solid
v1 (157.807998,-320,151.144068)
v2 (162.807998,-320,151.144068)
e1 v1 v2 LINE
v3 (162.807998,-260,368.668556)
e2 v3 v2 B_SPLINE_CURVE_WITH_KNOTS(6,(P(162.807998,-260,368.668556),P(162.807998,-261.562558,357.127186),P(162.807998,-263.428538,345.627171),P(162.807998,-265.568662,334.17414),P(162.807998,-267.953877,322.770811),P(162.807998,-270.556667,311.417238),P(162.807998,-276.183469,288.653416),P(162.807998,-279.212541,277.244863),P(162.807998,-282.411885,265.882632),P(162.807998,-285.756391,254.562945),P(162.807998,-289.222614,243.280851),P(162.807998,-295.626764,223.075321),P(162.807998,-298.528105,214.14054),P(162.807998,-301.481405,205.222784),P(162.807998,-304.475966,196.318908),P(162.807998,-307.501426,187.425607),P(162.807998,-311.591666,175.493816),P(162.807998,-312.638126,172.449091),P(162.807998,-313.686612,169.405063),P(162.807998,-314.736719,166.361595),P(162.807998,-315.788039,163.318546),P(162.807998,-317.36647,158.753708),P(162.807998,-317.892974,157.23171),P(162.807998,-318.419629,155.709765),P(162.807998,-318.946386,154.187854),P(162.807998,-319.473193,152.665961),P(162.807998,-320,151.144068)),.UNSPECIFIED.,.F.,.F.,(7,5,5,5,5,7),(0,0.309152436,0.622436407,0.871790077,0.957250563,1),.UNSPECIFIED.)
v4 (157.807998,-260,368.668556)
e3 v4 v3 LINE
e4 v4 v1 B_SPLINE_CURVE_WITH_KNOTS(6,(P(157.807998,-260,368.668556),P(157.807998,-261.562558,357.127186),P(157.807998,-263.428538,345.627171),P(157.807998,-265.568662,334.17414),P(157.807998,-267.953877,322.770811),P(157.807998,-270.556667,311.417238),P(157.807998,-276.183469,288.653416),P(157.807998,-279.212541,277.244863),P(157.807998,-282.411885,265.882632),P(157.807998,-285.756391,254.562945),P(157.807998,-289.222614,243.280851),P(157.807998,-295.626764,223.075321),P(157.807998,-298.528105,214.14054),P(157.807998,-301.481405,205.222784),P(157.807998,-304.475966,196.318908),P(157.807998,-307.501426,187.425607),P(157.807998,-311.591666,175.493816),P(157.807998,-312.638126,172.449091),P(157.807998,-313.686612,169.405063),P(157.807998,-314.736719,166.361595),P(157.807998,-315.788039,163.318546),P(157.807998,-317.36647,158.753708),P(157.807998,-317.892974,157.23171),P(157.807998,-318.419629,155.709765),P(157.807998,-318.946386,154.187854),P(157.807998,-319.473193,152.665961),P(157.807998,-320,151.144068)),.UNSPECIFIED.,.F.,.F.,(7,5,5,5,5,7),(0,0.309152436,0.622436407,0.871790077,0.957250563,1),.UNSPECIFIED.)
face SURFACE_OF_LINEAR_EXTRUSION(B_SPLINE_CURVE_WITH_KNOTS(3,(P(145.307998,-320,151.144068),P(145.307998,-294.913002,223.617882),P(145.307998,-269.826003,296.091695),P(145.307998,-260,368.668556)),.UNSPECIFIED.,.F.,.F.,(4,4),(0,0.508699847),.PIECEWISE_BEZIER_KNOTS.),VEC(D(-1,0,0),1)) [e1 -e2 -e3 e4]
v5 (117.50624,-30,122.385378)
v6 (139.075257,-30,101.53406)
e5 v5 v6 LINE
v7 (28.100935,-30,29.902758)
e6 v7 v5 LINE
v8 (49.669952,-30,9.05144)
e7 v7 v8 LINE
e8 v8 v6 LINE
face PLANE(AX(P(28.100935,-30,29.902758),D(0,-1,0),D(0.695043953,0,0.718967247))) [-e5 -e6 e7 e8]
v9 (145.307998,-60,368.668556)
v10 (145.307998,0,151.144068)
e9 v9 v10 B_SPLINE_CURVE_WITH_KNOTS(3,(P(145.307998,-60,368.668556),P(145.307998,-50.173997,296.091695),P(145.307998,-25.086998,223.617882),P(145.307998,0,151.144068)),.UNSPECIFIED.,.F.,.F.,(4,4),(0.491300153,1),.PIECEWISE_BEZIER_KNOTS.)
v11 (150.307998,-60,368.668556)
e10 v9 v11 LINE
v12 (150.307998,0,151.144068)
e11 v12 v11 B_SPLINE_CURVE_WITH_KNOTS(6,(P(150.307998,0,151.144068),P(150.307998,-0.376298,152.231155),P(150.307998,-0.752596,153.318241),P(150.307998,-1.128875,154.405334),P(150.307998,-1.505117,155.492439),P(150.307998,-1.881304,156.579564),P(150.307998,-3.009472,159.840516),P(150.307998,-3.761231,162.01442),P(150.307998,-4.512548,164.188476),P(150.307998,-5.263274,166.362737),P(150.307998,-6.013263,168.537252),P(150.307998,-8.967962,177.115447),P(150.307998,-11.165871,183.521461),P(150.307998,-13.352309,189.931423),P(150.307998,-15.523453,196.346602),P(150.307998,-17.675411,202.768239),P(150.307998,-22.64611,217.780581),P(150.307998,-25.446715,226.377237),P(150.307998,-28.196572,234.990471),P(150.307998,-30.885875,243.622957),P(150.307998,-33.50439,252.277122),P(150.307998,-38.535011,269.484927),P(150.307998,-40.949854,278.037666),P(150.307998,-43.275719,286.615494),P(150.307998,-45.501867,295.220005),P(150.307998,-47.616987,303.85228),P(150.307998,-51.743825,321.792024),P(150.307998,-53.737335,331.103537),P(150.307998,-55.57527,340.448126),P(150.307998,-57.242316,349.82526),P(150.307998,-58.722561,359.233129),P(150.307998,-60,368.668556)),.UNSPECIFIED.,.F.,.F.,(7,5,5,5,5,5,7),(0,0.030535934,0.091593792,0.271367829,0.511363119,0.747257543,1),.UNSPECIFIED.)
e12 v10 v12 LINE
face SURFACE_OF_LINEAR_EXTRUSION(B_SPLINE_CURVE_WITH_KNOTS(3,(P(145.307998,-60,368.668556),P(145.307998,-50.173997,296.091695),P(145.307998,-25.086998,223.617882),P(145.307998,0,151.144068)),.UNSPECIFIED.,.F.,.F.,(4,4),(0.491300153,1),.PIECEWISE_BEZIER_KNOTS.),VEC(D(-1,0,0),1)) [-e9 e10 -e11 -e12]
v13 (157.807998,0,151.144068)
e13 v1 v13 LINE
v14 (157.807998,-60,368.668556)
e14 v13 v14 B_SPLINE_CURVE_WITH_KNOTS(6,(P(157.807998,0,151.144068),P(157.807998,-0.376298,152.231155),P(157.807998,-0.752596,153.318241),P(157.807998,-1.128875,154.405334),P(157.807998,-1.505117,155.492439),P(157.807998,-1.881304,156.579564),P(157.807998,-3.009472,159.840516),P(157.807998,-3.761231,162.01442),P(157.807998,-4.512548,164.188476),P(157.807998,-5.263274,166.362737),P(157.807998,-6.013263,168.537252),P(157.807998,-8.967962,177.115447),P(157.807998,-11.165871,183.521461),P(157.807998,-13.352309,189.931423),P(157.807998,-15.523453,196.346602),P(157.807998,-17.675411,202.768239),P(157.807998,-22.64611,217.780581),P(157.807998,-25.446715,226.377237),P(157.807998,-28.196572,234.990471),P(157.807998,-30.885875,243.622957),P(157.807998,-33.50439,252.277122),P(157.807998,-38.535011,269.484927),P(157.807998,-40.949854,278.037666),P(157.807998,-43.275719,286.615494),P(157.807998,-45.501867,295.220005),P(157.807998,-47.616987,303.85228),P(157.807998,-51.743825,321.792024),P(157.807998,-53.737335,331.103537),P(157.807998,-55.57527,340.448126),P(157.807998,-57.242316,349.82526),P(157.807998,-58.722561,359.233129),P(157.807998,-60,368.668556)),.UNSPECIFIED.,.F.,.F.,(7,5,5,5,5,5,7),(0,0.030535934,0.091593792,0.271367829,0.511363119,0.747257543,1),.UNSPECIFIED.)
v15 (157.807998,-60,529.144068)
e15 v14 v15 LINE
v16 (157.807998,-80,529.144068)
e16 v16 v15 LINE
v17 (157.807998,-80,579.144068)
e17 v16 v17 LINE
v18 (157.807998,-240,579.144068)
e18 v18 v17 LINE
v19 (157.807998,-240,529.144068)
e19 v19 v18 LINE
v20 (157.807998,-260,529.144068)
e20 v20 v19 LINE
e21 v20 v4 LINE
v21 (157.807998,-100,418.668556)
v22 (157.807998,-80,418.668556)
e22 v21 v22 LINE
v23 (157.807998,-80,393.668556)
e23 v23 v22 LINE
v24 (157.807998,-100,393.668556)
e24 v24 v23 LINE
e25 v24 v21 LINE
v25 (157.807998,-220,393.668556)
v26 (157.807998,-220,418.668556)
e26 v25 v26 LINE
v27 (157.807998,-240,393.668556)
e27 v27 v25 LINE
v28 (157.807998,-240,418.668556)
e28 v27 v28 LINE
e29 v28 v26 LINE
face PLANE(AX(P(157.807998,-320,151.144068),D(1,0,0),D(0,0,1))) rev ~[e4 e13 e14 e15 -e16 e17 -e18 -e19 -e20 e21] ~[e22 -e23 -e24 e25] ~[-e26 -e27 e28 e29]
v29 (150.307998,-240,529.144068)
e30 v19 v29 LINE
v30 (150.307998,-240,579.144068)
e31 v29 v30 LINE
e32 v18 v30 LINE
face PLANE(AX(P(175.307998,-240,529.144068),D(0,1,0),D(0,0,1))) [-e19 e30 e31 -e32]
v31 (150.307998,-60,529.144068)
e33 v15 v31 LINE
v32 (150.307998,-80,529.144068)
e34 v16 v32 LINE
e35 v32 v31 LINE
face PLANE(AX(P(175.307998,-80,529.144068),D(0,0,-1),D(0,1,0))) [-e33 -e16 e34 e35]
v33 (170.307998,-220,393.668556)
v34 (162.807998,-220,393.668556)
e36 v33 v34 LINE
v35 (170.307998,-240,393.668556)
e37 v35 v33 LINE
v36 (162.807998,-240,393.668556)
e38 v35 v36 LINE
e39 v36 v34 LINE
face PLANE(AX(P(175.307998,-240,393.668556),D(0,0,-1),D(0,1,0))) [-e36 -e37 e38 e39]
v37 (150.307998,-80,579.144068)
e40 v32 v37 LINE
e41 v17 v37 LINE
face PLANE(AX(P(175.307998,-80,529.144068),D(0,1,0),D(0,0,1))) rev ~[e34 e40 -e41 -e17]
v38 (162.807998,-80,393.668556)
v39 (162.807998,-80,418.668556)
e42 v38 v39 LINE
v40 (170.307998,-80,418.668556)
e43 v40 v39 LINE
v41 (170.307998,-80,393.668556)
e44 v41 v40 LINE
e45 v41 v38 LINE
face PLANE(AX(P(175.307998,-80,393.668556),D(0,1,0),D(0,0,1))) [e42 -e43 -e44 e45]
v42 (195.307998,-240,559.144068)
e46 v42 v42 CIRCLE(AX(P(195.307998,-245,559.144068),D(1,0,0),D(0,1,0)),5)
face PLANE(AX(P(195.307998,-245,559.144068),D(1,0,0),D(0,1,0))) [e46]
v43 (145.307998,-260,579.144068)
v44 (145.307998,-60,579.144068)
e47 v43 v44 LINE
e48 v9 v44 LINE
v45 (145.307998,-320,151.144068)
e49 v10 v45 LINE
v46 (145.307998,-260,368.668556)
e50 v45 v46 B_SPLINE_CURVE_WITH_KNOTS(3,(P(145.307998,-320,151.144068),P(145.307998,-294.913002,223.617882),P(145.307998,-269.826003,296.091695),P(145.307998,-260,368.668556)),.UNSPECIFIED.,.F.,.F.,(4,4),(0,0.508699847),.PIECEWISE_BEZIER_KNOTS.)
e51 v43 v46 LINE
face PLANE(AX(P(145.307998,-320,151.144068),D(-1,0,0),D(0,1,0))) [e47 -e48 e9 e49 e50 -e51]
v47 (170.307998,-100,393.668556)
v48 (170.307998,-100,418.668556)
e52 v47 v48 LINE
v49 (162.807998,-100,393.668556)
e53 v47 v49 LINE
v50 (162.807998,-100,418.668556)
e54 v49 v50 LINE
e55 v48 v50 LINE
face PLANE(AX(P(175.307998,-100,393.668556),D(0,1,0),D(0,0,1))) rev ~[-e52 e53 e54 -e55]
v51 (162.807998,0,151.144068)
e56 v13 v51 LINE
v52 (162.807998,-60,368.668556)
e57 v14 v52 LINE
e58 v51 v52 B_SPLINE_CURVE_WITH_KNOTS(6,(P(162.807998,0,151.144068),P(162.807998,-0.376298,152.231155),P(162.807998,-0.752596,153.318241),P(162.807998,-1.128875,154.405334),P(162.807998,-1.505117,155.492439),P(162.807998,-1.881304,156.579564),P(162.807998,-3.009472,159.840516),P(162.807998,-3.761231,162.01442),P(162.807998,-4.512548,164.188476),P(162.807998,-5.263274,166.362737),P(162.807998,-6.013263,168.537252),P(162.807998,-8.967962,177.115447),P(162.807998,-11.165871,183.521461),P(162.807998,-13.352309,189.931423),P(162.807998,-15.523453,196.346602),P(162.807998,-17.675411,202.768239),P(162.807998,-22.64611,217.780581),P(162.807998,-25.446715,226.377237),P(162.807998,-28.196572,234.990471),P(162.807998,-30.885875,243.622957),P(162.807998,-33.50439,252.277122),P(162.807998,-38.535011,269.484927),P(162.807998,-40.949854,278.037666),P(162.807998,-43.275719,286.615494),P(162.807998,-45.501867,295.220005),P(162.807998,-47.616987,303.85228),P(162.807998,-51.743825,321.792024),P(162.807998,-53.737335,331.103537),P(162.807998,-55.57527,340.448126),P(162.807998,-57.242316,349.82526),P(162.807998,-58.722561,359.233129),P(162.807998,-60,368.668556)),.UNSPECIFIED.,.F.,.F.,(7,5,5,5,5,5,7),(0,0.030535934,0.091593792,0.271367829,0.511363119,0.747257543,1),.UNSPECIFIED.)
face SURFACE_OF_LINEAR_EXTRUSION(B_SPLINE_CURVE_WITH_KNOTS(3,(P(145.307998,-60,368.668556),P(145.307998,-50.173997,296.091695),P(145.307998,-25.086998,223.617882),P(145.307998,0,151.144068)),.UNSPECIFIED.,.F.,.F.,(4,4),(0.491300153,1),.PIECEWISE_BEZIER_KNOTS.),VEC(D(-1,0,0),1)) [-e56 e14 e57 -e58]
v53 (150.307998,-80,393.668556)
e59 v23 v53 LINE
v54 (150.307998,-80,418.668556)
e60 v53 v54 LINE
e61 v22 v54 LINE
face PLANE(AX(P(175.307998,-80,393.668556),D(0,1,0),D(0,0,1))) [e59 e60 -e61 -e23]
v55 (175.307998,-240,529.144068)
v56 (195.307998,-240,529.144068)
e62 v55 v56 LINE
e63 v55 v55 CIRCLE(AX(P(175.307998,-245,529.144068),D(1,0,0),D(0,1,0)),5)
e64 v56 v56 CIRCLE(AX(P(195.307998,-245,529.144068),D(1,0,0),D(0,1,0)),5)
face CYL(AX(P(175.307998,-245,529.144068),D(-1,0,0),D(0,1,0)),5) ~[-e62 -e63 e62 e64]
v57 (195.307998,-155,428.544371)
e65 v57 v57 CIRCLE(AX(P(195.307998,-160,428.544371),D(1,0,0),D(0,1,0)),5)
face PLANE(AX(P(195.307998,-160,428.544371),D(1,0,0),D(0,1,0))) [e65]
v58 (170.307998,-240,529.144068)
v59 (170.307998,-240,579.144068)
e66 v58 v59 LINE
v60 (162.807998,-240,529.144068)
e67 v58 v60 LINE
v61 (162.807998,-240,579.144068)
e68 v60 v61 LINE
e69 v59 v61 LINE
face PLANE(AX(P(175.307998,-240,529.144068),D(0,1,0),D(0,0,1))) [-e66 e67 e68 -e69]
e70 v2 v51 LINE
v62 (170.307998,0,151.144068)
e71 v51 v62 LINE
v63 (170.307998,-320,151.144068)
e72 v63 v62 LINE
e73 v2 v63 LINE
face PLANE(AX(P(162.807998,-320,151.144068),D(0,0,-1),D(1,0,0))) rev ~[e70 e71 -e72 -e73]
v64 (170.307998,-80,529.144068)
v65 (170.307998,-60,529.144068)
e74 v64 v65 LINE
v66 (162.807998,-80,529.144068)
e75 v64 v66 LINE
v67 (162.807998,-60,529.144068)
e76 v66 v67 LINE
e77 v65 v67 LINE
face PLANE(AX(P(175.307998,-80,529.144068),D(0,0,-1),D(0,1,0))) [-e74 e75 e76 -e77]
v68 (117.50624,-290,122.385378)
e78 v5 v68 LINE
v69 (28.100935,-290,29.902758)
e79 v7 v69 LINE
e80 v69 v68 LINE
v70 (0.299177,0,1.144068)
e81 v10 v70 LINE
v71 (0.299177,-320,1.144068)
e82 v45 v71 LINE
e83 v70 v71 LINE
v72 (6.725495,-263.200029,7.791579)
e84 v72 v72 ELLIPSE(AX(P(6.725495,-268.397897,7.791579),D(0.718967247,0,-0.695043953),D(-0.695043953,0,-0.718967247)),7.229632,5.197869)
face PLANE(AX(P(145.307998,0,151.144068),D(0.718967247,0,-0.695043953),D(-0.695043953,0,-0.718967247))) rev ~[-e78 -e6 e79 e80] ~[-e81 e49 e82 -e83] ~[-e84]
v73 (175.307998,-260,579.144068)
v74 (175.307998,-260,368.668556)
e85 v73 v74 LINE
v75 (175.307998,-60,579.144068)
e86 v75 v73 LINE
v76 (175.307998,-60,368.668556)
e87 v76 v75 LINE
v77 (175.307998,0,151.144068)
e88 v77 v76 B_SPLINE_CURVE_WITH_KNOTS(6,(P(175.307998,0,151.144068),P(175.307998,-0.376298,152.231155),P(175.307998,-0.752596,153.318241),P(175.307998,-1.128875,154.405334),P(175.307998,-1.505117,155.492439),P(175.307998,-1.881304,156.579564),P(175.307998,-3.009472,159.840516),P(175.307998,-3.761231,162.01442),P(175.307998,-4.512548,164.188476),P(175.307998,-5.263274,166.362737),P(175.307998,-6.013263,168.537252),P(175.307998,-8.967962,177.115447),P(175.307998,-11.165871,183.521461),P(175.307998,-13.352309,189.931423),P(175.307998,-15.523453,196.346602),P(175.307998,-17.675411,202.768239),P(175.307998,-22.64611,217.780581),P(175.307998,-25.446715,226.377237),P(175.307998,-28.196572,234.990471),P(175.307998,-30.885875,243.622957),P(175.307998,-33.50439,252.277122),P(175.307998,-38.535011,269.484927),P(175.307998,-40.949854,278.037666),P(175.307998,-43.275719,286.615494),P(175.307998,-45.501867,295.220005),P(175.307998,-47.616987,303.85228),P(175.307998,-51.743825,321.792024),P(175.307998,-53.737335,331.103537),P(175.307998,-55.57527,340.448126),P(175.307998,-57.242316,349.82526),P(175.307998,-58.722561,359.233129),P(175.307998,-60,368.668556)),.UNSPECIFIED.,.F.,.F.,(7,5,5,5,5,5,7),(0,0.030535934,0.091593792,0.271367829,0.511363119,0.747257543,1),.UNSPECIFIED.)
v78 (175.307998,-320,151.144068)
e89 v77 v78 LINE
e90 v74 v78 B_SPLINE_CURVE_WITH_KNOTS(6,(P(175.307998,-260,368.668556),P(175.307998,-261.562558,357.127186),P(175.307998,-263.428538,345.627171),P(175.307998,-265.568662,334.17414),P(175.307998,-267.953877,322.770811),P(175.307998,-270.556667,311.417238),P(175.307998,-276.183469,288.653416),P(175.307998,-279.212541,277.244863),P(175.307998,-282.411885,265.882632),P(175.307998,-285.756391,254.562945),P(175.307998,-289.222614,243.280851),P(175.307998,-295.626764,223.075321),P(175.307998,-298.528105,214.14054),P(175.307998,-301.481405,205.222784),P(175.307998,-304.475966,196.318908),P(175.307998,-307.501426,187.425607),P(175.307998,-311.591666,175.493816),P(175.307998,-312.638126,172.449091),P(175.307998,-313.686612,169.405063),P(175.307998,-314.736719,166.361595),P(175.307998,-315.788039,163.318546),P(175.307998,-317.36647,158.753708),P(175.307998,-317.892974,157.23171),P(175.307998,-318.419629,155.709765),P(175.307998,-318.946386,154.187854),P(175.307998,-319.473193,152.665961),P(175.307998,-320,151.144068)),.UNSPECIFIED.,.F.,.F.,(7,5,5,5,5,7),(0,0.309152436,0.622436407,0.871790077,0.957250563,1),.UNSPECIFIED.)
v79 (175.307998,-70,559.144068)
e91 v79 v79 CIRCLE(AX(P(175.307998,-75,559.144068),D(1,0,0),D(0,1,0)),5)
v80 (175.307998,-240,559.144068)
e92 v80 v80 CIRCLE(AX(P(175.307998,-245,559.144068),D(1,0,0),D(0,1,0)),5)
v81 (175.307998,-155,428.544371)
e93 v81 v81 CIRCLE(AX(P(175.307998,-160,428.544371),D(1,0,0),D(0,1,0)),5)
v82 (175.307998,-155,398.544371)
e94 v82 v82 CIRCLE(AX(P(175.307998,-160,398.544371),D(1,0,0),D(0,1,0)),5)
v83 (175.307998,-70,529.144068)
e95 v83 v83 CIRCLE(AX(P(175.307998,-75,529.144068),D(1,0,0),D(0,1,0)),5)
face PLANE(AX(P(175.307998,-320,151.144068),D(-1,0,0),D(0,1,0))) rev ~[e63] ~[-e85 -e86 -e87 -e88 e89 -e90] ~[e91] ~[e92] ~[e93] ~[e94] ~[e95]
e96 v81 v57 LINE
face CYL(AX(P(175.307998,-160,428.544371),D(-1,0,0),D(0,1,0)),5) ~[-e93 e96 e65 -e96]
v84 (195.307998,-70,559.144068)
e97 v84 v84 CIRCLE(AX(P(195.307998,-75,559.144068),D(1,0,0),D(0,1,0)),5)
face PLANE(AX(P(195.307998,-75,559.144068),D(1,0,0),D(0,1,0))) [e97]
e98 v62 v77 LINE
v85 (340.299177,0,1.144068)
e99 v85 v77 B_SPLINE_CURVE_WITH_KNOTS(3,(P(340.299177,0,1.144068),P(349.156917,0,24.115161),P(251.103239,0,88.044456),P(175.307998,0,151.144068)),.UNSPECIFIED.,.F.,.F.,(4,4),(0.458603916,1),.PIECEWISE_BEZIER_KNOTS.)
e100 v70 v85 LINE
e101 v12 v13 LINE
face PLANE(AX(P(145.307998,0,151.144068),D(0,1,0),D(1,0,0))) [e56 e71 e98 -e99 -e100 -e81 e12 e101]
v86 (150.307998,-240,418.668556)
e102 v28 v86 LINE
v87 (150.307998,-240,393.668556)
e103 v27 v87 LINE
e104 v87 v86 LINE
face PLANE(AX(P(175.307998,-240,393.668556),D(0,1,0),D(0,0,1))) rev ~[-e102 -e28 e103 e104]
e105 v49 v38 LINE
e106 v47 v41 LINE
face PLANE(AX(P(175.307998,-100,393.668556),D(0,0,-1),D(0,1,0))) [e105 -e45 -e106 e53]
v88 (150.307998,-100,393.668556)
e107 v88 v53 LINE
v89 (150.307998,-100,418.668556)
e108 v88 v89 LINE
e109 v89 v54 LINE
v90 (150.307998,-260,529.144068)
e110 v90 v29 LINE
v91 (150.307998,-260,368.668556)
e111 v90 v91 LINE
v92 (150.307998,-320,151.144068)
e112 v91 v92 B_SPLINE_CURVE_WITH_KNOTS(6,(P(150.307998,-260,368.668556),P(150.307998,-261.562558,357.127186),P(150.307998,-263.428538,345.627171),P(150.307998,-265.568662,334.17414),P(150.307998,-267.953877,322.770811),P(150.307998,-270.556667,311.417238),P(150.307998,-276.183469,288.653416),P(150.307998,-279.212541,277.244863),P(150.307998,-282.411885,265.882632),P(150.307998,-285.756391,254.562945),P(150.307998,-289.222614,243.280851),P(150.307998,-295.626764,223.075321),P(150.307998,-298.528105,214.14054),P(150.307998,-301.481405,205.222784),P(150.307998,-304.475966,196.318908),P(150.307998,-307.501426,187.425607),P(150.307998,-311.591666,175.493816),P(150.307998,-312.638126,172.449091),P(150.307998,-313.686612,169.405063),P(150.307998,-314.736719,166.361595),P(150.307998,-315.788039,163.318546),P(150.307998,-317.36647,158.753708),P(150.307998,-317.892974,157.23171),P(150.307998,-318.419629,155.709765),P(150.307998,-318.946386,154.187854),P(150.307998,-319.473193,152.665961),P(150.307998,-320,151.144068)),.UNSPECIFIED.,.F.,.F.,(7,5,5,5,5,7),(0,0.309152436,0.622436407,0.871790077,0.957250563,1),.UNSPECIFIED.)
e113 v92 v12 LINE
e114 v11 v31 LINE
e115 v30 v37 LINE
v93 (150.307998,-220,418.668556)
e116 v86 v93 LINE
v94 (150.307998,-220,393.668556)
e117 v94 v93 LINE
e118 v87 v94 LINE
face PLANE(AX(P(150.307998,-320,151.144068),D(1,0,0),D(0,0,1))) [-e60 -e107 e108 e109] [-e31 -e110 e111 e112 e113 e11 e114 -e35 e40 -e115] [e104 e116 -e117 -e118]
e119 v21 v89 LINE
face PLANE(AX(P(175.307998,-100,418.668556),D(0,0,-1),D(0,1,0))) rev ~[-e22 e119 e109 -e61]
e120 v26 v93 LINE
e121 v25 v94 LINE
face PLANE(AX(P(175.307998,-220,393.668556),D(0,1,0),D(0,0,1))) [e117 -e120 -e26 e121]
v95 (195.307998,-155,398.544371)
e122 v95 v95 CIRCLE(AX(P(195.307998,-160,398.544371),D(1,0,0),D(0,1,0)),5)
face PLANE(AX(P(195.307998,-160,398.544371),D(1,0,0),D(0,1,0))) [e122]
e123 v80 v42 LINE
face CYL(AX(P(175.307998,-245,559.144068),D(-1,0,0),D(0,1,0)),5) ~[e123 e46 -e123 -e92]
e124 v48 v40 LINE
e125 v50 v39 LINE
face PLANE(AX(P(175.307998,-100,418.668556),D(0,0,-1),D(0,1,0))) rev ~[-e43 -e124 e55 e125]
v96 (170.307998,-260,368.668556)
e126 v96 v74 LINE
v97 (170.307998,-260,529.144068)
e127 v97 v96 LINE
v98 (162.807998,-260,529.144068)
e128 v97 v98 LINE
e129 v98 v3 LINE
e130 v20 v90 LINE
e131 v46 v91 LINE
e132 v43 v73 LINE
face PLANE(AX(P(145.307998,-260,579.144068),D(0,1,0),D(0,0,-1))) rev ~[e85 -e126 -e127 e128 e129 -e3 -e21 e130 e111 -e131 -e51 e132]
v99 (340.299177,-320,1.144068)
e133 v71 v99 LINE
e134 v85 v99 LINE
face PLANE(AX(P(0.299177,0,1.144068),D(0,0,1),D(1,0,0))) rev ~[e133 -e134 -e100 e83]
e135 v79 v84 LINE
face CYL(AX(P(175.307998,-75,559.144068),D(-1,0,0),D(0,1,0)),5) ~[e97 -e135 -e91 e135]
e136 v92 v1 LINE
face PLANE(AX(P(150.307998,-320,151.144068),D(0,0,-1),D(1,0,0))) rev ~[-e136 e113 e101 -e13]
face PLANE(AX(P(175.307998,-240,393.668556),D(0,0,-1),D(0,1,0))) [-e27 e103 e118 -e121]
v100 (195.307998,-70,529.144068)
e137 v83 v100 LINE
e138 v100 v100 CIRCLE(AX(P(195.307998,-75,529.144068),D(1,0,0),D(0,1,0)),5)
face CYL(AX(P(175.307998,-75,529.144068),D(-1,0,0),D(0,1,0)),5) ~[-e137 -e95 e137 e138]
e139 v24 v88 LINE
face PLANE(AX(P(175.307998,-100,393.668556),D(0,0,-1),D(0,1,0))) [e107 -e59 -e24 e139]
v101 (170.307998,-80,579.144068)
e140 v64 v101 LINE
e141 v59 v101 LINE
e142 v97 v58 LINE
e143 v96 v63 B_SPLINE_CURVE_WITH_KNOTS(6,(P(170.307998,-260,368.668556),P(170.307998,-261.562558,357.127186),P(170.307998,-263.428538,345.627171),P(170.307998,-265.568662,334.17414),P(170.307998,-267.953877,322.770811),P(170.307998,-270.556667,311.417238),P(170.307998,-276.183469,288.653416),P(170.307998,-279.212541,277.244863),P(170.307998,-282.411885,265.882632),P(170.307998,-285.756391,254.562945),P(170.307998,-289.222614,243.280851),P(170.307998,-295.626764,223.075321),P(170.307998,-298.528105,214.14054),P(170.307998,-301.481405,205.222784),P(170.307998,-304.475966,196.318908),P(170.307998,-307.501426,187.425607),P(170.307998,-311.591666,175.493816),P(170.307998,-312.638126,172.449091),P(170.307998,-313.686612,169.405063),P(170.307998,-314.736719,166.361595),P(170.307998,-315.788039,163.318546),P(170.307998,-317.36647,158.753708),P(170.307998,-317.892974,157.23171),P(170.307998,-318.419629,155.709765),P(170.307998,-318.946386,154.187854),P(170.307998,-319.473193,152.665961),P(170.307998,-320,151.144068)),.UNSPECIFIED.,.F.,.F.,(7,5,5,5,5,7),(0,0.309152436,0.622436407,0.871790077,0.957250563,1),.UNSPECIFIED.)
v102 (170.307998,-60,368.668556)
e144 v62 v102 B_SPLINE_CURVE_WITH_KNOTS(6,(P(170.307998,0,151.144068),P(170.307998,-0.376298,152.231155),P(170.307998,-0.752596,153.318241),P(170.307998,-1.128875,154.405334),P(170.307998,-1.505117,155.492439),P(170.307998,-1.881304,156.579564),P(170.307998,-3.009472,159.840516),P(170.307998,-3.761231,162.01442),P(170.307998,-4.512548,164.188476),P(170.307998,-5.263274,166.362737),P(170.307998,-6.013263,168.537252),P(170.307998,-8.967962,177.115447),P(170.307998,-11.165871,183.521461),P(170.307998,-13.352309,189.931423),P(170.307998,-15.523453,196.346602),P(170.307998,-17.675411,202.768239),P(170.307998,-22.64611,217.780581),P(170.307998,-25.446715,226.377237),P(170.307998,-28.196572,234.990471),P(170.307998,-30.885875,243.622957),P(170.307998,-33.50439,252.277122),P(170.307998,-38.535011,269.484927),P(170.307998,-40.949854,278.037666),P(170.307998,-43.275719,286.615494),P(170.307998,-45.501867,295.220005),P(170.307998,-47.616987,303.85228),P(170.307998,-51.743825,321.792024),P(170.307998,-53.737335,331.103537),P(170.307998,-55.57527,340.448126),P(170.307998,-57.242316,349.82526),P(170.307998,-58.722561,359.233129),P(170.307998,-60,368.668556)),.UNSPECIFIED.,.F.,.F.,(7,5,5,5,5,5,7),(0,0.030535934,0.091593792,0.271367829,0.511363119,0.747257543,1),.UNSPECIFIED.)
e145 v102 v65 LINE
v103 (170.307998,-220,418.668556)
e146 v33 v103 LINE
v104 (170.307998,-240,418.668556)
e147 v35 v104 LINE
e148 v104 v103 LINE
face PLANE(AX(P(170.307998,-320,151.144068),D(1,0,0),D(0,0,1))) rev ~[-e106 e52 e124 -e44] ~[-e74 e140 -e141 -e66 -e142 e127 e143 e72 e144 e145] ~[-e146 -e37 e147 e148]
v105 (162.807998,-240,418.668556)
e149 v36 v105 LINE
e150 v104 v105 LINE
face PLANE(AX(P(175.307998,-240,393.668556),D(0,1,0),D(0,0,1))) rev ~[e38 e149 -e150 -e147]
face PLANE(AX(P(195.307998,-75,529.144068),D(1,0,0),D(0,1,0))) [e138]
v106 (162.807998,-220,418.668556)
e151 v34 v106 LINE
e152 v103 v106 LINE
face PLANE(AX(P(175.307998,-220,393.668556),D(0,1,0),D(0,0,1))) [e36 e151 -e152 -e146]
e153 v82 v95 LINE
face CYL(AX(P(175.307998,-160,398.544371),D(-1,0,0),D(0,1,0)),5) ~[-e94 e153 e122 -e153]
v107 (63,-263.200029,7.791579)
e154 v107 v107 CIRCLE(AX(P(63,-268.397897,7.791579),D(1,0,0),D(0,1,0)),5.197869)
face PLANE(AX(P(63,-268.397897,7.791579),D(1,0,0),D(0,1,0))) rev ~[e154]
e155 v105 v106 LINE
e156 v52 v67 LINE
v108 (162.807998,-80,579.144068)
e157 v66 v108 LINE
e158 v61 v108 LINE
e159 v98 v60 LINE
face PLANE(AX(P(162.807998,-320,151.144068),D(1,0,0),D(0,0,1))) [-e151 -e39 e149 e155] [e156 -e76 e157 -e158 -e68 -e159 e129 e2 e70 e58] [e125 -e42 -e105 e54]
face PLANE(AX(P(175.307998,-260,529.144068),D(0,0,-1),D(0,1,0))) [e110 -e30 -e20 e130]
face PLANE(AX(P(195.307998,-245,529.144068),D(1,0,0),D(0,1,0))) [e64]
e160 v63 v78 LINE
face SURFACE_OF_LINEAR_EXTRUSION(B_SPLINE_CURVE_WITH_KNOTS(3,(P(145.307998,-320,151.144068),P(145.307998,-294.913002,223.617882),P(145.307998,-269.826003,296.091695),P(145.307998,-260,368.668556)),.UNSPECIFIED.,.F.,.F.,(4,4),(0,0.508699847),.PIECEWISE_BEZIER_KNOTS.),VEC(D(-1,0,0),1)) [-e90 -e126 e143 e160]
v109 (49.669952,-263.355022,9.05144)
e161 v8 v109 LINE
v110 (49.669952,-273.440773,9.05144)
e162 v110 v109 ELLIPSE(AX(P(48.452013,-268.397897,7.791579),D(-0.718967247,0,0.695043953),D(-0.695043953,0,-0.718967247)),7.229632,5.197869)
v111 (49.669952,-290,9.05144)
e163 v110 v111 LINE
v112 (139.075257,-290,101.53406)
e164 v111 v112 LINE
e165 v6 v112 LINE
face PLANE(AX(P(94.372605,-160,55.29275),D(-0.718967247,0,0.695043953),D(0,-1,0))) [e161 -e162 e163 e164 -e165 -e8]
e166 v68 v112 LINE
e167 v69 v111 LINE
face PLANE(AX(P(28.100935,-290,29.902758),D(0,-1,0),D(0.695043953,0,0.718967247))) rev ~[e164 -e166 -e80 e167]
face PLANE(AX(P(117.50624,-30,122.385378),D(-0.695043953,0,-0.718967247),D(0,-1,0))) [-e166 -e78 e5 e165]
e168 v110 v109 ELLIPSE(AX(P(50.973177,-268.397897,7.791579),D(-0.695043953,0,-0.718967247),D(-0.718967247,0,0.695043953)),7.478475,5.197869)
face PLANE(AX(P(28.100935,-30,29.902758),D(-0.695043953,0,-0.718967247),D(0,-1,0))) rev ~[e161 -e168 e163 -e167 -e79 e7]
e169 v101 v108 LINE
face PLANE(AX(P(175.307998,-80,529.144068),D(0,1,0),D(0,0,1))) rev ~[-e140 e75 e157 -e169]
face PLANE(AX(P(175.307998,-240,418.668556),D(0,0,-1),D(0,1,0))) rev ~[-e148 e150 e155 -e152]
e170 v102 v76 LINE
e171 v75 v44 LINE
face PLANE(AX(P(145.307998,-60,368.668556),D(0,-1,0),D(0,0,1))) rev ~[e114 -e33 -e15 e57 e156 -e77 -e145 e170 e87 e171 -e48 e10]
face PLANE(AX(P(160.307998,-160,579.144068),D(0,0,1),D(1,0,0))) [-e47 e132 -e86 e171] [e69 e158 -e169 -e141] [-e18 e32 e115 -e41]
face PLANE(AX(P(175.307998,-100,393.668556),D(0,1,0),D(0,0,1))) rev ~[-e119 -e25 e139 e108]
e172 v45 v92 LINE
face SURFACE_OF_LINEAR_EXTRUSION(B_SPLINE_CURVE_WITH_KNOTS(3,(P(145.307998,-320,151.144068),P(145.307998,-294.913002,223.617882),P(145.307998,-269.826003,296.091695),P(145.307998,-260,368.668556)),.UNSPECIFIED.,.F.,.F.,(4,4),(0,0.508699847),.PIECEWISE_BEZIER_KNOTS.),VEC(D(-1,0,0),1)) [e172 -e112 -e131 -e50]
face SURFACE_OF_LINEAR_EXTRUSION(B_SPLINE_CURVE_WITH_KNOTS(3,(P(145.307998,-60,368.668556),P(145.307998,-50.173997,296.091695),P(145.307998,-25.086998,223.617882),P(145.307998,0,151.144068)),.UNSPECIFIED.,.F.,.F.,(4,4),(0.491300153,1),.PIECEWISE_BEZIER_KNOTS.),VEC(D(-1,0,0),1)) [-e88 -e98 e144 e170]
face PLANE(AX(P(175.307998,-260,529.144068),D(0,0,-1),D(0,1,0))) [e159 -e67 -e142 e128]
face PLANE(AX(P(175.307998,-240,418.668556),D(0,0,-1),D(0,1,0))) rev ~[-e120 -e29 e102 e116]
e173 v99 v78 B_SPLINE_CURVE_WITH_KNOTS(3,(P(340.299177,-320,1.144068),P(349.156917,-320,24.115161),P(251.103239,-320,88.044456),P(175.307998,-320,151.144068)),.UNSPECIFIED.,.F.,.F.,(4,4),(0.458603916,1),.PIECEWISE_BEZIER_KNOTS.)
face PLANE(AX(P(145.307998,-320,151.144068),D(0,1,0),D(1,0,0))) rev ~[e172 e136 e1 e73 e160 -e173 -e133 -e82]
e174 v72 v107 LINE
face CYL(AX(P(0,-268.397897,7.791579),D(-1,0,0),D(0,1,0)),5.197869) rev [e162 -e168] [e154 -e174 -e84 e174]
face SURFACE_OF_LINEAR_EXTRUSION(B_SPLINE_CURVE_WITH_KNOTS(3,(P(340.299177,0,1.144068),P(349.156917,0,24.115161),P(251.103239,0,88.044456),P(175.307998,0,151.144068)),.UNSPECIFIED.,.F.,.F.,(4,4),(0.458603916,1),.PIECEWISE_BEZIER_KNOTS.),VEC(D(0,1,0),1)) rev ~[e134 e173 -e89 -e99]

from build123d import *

# Parameters (mm, degrees)
F1_DEPTH  = 320
F2_W      = 30
F2_H      = 320
F3_DEPTH  = 428
F5_DEPTH  = 205
F7_W      = 260
F7_H      = 128.6325914682
F8_DEPTH  = 30
F9_W      = 7.5
F9_H      = 457.219858036
F10_DEPTH = 977
F6_W      = 20
F6_H      = 50
F6_H_2    = 25
F11_DEPTH = 25
F12_R     = 5.1978686685
F13_DEPTH = 63
F14_R     = 5
F15_DEPTH = 20


with BuildPart() as f1:
    # F0 (on Front) → F1 (new body)
    with BuildSketch(Plane.XZ):
        with BuildLine():
            Line((150.299176857, 1.1440683747), (180.299176857, 1.1440683747))
            Line((180.299176857, 1.1440683747), (340.299176857, 1.1440683747))
            add(Edge.make_bspline(
                [(340.299176857, 1.1440683747), (349.1569172885, 24.1151609846), (251.1032390966, 88.0444564268), (175.3079980464, 151.1440683747)],
                knots=[0.4586039165, 0.4586039165, 0.4586039165, 0.4586039165, 1, 1, 1, 1], degree=3))
            Line((175.3079980464, 151.1440683747), (145.3079980464, 151.1440683747))
            Line((145.3079980464, 151.1440683747), (0.299176857, 1.1440683747))
            Line((0.299176857, 1.1440683747), (100.299176857, 1.1440683747))
            Line((100.299176857, 1.1440683747), (150.299176857, 1.1440683747))
        make_face()
    extrude(amount=F1_DEPTH)

    # F2 (on face) → F3 (join)
    with BuildSketch(Plane.XY.offset(151.1440683747)):
        with Locations((160.3079980464, -160)):
            Rectangle(F2_W, F2_H)
    extrude(amount=F3_DEPTH)

    # F4 (on face) → F5 (cut)
    with BuildSketch(Plane(origin=(145.3079980464, 0, 0), x_dir=(0, -1, 0), z_dir=(-1, 0, 0))):
        with BuildLine():
            Line((0, 579.1440683747), (0, 151.1440683747))
            add(Edge.make_bspline(
                [(60, 368.6685562134), (50.1739969339, 296.0916949665), (25.086998467, 223.6178816706), (0, 151.1440683747)],
                knots=[0.4913001533, 0.4913001533, 0.4913001533, 0.4913001533, 1, 1, 1, 1], degree=3))
            Line((60, 368.6685562134), (60, 579.1440683747))
            Line((60, 579.1440683747), (0, 579.1440683747))
        make_face()
        with BuildLine():
            add(Edge.make_bspline(
                [(320, 151.1440683747), (294.913001533, 223.6178816706), (269.8260030661, 296.0916949665), (260, 368.6685562134)],
                knots=[0, 0, 0, 0, 0.5086998467, 0.5086998467, 0.5086998467, 0.5086998467], degree=3))
            Line((320, 151.1440683747), (320, 579.1440683747))
            Line((320, 579.1440683747), (260, 579.1440683747))
            Line((260, 579.1440683747), (260, 368.6685562134))
        make_face()
    extrude(amount=-F5_DEPTH, mode=Mode.SUBTRACT)

    # F7 (on face) → F8 (cut)
    with BuildSketch(Plane(origin=(-0.4170581217, 0, 0.4031807106), x_dir=(0, -1, 0), z_dir=(-0.7189672474, 0, 0.6950439534))):
        with Locations((160, 105.3467844897)):
            Rectangle(F7_W, F7_H)
    extrude(amount=-F8_DEPTH, mode=Mode.SUBTRACT)

    # F9 (on face) → F10 (cut)
    with BuildSketch(Plane.XZ.offset(320)):
        with Locations((154.0579980464, 379.7539973927)):
            Rectangle(F9_W, F9_H)
        with Locations((166.5579980464, 379.7539973927)):
            Rectangle(F9_W, F9_H)
    extrude(amount=-F10_DEPTH, mode=Mode.SUBTRACT)

    # F6 (on face) → F11 (join)
    with BuildSketch(Plane.YZ.offset(175.3079980464)):
        with Locations((-250, 554.1440683747)):
            Rectangle(F6_W, F6_H)
        with Locations((-70, 554.1440683747)):
            Rectangle(F6_W, F6_H)
        with Locations((-230, 406.1685562134)):
            Rectangle(F6_W, F6_H_2)
        with Locations((-90, 406.1685562134)):
            Rectangle(F6_W, F6_H_2)
    extrude(amount=-F11_DEPTH)

    # F12 (on Right) → F13 (cut)
    with BuildSketch(Plane.YZ):
        with Locations((-268.3978974819, 7.7915792353)):
            Circle(F12_R)
    extrude(amount=F13_DEPTH, mode=Mode.SUBTRACT)

    # F14 (on face) → F15 (join)
    with BuildSketch(Plane.YZ.offset(175.3079980464)):
        with Locations((-245, 559.1440683747)):
            Circle(F14_R)
        with Locations((-245, 529.1440683747)):
            Circle(F14_R)
        with Locations((-75, 559.1440683747)):
            Circle(F14_R)
        with Locations((-75, 529.1440683747)):
            Circle(F14_R)
        with Locations((-160, 428.5443711281)):
            Circle(F14_R)
        with Locations((-160, 398.5443711281)):
            Circle(F14_R)
    extrude(amount=F15_DEPTH)


solid = f1.part
